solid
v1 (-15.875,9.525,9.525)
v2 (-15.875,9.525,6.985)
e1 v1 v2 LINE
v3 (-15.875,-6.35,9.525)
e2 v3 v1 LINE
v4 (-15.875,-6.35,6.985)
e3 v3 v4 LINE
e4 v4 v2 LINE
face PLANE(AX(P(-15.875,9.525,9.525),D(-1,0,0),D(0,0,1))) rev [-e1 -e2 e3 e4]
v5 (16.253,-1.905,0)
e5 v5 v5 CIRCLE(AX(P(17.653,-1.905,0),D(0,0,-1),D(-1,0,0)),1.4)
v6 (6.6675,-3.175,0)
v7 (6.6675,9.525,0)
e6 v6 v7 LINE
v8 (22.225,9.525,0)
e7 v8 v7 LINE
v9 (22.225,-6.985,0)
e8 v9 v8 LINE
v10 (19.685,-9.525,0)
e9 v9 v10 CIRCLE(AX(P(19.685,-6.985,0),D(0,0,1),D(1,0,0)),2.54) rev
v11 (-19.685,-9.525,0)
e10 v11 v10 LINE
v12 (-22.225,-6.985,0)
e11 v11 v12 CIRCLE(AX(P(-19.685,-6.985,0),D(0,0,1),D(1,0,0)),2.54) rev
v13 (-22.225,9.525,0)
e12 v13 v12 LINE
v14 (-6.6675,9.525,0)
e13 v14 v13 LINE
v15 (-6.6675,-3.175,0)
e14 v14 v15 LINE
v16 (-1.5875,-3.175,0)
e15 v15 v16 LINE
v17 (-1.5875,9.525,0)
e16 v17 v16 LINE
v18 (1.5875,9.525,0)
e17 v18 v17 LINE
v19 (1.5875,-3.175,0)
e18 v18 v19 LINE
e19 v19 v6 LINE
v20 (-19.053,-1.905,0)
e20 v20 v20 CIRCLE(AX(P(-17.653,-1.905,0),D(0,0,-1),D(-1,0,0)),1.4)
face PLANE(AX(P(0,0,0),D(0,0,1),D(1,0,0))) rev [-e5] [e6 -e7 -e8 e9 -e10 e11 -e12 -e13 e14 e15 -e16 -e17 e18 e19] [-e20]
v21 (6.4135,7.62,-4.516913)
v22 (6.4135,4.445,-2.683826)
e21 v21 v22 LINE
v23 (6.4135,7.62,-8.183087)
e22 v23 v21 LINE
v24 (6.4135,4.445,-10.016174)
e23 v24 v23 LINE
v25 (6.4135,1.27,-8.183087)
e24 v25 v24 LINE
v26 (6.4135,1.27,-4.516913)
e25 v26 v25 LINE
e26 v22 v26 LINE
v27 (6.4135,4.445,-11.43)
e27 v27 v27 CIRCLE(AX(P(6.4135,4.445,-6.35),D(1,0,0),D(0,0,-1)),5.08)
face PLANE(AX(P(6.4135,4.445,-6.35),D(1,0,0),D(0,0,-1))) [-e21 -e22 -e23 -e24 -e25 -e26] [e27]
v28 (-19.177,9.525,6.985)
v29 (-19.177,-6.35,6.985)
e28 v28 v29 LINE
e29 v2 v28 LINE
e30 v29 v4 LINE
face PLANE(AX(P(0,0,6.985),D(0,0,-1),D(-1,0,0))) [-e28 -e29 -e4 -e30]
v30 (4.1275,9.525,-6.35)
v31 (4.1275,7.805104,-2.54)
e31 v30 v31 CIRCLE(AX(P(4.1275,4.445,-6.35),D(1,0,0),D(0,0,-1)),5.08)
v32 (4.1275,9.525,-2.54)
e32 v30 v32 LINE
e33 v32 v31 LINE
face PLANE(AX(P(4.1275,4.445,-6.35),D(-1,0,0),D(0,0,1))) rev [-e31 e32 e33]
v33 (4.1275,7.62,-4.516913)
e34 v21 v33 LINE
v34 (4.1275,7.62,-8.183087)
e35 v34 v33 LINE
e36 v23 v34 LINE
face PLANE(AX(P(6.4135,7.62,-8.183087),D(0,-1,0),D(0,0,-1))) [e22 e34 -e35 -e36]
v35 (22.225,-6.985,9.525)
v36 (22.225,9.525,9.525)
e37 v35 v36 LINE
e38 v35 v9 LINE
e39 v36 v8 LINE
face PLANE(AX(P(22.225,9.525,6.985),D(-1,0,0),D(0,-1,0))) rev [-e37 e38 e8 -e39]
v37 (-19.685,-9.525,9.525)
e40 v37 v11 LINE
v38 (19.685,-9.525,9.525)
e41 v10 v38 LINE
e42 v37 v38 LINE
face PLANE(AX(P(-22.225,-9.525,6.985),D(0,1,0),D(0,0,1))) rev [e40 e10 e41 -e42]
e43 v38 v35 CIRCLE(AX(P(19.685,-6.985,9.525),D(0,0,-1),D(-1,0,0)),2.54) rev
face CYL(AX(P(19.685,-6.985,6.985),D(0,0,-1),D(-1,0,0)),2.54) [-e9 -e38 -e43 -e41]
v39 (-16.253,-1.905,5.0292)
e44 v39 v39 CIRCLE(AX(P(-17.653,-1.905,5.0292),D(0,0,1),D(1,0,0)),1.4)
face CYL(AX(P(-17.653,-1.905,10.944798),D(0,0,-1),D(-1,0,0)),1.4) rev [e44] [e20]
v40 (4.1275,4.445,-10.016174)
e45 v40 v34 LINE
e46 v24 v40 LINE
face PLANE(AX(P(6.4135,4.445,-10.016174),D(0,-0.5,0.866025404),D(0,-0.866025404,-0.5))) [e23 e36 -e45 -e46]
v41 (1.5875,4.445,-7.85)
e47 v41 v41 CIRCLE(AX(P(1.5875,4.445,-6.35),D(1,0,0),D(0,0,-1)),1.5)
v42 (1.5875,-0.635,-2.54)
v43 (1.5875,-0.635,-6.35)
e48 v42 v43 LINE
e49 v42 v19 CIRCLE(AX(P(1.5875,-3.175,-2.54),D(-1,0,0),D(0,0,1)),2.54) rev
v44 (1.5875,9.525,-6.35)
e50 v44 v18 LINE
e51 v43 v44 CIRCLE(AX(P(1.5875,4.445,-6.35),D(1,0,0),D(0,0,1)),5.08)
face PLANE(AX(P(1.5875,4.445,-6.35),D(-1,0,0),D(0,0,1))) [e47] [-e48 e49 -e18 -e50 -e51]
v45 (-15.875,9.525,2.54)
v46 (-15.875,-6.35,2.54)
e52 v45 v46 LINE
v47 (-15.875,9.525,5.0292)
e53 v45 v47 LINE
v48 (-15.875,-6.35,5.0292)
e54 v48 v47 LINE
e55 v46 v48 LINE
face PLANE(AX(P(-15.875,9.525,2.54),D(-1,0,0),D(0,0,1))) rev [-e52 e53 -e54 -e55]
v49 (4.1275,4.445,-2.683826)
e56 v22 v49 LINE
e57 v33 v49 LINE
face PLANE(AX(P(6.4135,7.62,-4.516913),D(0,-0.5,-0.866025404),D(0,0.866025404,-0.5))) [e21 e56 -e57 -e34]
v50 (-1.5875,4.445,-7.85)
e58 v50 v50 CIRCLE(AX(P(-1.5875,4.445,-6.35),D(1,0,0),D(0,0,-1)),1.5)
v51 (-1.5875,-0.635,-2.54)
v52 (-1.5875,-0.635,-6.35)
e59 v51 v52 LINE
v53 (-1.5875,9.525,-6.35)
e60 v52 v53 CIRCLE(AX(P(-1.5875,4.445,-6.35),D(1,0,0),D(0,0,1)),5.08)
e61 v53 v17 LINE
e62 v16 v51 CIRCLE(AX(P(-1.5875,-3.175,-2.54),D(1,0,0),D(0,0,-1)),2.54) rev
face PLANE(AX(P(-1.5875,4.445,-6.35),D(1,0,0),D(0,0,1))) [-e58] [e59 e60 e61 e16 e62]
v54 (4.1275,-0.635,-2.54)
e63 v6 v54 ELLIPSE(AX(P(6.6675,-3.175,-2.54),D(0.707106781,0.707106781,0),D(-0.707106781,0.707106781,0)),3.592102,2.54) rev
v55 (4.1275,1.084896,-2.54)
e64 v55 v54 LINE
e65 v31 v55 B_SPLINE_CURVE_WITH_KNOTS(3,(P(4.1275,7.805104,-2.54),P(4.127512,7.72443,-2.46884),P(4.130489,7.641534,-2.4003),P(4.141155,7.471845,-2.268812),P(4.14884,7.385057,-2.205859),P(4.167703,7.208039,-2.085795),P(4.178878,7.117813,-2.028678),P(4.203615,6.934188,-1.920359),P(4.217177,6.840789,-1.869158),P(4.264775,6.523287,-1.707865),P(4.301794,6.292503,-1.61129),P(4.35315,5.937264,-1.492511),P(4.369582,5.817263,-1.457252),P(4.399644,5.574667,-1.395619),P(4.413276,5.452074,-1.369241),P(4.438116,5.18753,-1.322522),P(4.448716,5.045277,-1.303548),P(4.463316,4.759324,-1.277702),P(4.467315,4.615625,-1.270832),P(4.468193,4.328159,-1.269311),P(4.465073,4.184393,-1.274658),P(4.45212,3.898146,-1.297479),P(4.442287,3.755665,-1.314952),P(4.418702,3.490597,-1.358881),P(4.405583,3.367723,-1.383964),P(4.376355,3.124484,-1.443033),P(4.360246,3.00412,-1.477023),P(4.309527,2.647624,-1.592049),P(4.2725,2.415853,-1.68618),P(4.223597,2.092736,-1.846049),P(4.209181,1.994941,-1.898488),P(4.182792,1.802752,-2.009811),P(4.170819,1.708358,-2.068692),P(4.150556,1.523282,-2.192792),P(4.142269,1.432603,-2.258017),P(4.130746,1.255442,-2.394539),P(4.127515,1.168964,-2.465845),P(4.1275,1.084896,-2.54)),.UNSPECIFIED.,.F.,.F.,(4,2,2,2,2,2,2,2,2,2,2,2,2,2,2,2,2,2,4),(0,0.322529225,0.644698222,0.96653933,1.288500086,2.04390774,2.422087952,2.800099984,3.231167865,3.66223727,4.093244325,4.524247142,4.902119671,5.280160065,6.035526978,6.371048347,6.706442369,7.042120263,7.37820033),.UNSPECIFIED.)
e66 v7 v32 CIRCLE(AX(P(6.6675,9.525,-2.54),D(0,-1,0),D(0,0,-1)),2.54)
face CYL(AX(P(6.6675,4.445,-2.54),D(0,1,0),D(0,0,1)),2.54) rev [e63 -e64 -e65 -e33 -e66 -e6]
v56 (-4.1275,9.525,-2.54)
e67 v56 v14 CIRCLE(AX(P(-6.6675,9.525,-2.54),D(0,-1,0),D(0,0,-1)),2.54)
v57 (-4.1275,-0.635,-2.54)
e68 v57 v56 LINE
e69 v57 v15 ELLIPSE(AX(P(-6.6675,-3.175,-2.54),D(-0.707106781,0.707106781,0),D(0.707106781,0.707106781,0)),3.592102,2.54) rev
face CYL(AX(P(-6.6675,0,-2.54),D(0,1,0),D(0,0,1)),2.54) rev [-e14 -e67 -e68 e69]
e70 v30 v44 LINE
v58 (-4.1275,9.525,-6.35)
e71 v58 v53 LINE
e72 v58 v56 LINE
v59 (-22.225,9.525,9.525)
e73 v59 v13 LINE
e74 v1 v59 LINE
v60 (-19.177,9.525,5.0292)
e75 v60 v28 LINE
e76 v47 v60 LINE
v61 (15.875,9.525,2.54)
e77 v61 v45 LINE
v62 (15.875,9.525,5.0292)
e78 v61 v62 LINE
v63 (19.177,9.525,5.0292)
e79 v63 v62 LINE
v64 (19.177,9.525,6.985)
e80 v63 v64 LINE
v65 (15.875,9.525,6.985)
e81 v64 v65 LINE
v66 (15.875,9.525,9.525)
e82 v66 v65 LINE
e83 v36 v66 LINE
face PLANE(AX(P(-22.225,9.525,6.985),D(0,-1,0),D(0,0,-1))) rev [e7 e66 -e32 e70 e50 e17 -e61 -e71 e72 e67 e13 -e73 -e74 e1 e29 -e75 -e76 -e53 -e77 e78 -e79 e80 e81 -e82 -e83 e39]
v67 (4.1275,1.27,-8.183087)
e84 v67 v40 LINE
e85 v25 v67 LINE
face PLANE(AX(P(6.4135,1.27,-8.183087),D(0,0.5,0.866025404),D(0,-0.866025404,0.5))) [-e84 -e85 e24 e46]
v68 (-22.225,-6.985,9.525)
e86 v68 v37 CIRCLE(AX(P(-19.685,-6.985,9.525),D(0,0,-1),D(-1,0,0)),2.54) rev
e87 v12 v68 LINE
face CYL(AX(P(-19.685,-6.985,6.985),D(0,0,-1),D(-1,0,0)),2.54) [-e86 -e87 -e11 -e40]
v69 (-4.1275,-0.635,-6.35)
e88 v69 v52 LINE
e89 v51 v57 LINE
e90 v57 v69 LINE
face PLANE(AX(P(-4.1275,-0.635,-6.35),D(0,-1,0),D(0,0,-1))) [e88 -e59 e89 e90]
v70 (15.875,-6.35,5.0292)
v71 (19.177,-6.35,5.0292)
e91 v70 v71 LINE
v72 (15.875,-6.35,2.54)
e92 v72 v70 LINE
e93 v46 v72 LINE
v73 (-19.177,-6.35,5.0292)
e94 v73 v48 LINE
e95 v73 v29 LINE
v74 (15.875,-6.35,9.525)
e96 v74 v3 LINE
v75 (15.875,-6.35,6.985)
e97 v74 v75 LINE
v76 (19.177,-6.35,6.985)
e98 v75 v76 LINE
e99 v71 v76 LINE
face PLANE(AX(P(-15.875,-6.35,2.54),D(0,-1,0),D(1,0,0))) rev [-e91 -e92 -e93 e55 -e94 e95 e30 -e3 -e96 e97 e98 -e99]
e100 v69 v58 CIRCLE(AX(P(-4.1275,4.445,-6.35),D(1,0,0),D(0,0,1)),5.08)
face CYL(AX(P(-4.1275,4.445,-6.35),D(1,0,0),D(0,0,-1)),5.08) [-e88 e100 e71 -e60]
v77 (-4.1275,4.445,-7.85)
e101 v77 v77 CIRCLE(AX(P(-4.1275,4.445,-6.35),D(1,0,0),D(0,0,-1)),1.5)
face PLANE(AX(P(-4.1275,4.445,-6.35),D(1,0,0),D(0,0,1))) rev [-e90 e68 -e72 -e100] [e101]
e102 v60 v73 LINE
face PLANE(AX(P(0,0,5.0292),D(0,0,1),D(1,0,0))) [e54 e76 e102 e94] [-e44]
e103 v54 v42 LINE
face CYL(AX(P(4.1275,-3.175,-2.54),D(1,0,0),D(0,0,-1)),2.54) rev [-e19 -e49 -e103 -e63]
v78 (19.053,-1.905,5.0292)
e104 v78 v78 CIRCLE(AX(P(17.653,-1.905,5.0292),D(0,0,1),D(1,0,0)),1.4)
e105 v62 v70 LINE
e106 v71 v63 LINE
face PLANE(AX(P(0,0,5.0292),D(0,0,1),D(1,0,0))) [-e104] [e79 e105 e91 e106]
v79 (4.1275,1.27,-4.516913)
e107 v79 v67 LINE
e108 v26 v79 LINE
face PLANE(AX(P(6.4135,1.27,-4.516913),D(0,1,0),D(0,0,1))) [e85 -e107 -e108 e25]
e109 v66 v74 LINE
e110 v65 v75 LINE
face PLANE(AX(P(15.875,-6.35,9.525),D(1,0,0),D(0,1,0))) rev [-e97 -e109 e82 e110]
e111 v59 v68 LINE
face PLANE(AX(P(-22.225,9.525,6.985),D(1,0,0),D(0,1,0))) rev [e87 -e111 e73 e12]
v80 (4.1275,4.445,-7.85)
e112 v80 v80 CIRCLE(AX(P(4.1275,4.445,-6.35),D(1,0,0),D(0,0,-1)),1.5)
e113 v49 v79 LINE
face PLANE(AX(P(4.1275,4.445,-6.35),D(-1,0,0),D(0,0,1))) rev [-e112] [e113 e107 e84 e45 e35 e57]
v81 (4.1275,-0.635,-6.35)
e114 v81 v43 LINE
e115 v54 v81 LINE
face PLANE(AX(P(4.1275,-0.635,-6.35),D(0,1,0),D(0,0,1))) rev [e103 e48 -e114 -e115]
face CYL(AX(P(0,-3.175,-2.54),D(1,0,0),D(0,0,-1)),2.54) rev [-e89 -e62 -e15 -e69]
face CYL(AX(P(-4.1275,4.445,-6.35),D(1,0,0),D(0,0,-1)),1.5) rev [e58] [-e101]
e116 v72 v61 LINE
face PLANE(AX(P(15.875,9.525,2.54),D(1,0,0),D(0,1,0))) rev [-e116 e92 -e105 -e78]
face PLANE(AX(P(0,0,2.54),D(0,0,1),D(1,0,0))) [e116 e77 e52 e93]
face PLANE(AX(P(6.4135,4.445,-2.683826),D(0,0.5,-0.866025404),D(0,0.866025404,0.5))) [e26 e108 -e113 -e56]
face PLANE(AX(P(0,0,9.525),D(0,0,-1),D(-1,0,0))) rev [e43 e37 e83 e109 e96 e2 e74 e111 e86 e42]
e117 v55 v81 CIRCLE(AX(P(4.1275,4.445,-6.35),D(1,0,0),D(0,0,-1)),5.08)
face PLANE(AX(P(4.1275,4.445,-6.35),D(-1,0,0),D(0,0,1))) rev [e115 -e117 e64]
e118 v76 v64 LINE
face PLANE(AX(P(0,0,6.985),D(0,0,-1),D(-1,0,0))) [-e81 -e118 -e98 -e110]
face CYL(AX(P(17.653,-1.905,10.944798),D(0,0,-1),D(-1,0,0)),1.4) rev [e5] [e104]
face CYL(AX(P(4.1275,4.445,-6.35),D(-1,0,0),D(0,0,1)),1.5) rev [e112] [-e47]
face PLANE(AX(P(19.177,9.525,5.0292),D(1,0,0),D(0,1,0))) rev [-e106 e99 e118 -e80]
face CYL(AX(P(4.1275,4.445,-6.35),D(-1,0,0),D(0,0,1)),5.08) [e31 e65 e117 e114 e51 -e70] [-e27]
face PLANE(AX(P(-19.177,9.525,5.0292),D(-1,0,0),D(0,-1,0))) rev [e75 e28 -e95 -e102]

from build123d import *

# Parameters (mm, degrees)
SKETCH1_W           = 44.45
SKETCH1_H           = 19.05
BOSS_EXTRUDE1_DEPTH = 6.985
BOSS_EXTRUDE3_START = 1.5875
SKETCH4_R           = 1.5
BOSS_EXTRUDE3_DEPTH = 2.54
SKETCH5_R           = 5.08
BOSS_EXTRUDE4_DEPTH = 2.286
FILLET3_R           = 2.54
FILLET4_R           = 2.54
SKETCH7_W           = 31.75
SKETCH7_H           = 15.875
CUT_EXTRUDE1_DEPTH  = 4.445
SKETCH8_W           = 38.354
SKETCH8_H           = 15.875
CUT_EXTRUDE2_DEPTH  = 1.9558
BOSS_EXTRUDE5_DEPTH = 2.54
FILLET5_R           = 2.54
SKETCH12_R          = 1.4
CUT_EXTRUDE5_DEPTH  = 6.985


with BuildPart() as part:
    # Sketch1 → Boss-Extrude1 (new body)
    with BuildSketch(Plane.XY):
        Rectangle(SKETCH1_W, SKETCH1_H)
    extrude(amount=BOSS_EXTRUDE1_DEPTH)

    # Sketch4 → Boss-Extrude3 (add)
    with BuildSketch(Plane(origin=(0, 0, 0), x_dir=(0, 0, -1), z_dir=(1, 0, 0)).offset(BOSS_EXTRUDE3_START)):
        with BuildLine():
            Line((0, 9.525), (6.35, 9.525))
            ThreePointArc((6.35, 9.525), (11.43, 4.445), (6.35, -0.635))
            Line((6.35, -0.635), (0, -0.635))
            Line((0, -0.635), (0, 9.525))
        make_face()
        with Locations((6.35, 4.445)):
            Circle(SKETCH4_R, mode=Mode.SUBTRACT)
    boss_extrude3 = extrude(amount=BOSS_EXTRUDE3_DEPTH)

    # Mirror1: Boss-Extrude3 across plane
    add(boss_extrude3.mirror(Plane(origin=(0, 0, 0), x_dir=(0, 0, 1), z_dir=(1, 0, 0))))

    # Sketch5 → Boss-Extrude4 (add)
    with BuildSketch(Plane(origin=(4.1275, 0, 0), x_dir=(0, 0, -1), z_dir=(1, 0, 0))):
        with Locations(Location((6.35, 4.445, 0), (0, 0, 90))):
            Circle(SKETCH5_R)
        Polygon((8.183087105, 7.62), (4.516912895, 7.62), (2.683825791, 4.445), (4.516912895, 1.27), (8.183087105, 1.27), (10.016174209, 4.445), align=None, mode=Mode.SUBTRACT)
    extrude(amount=BOSS_EXTRUDE4_DEPTH)

    # Fillet3
    # the kernel refuses this fillet: 2.54 mm, written as the material it adds along each edge
    with BuildSketch(Plane(origin=(-4.1275, -0.635, 0), x_dir=(-1, 0, 0), z_dir=(0, 1, 0))) as fillet3_piece_1:
        with BuildLine():
            CenterArc((FILLET3_R, -FILLET3_R), FILLET3_R, 90, 90)
            Line((0, -FILLET3_R), (0, 0))
            Line((0, 0), (FILLET3_R, 0))
        make_face()
    extrude(amount=10.16)
    with BuildSketch(Plane(origin=(4.1275, -0.635, 0), x_dir=(1, 0, 0), z_dir=(0, 1, 0))) as fillet3_piece_2:
        with BuildLine():
            CenterArc((FILLET3_R, FILLET3_R), FILLET3_R, 180, 90)
            Line((0, FILLET3_R), (0, 0))
            Line((0, 0), (FILLET3_R, 0))
        make_face()
    extrude(amount=10.16)

    # Fillet4
    fillet4_edges = [part.edges().sort_by_distance(p)[0] for p in [
        (-4.1275, -0.635, 0),
        (4.1275, -0.635, 0),
    ]]
    fillet(fillet4_edges, radius=FILLET4_R)

    # Sketch7 → Cut-Extrude1 (cut)
    with BuildSketch(Plane.XY.offset(6.985)):
        with Locations((0, 1.5875)):
            Rectangle(SKETCH7_W, SKETCH7_H)
    extrude(amount=-CUT_EXTRUDE1_DEPTH, mode=Mode.SUBTRACT)

    # Sketch8 → Cut-Extrude2 (cut)
    with BuildSketch(Plane.XY.offset(6.985)):
        with Locations((0, 1.5875)):
            Rectangle(SKETCH8_W, SKETCH8_H)
    extrude(amount=-CUT_EXTRUDE2_DEPTH, mode=Mode.SUBTRACT)

    # Sketch9 → Boss-Extrude5 (add)
    with BuildSketch(Plane.XY.offset(6.985)):
        Polygon((-22.225, 9.525), (-15.875, 9.525), (-15.875, -6.35), (15.875, -6.35), (15.875, 9.525), (22.225, 9.525), (22.225, -9.525), (-22.225, -9.525), align=None)
    extrude(amount=BOSS_EXTRUDE5_DEPTH)

    # Fillet5
    fillet5_edges = [part.edges().sort_by_distance(p)[0] for p in [
        (22.225, -9.525, 4.7625),
        (-22.225, -9.525, 4.7625),
    ]]
    fillet(fillet5_edges, radius=FILLET5_R)

    # Sketch12 → Cut-Extrude5 (cut)
    with BuildSketch(Plane(origin=(0, 0, 0), x_dir=(-1, 0, 0), z_dir=(0, 0, -1))):
        with Locations((-17.653, -1.905)):
            Circle(SKETCH12_R)
        with Locations((17.653, -1.905)):
            Circle(SKETCH12_R)
    extrude(amount=-CUT_EXTRUDE5_DEPTH, mode=Mode.SUBTRACT)


solid = part.part
